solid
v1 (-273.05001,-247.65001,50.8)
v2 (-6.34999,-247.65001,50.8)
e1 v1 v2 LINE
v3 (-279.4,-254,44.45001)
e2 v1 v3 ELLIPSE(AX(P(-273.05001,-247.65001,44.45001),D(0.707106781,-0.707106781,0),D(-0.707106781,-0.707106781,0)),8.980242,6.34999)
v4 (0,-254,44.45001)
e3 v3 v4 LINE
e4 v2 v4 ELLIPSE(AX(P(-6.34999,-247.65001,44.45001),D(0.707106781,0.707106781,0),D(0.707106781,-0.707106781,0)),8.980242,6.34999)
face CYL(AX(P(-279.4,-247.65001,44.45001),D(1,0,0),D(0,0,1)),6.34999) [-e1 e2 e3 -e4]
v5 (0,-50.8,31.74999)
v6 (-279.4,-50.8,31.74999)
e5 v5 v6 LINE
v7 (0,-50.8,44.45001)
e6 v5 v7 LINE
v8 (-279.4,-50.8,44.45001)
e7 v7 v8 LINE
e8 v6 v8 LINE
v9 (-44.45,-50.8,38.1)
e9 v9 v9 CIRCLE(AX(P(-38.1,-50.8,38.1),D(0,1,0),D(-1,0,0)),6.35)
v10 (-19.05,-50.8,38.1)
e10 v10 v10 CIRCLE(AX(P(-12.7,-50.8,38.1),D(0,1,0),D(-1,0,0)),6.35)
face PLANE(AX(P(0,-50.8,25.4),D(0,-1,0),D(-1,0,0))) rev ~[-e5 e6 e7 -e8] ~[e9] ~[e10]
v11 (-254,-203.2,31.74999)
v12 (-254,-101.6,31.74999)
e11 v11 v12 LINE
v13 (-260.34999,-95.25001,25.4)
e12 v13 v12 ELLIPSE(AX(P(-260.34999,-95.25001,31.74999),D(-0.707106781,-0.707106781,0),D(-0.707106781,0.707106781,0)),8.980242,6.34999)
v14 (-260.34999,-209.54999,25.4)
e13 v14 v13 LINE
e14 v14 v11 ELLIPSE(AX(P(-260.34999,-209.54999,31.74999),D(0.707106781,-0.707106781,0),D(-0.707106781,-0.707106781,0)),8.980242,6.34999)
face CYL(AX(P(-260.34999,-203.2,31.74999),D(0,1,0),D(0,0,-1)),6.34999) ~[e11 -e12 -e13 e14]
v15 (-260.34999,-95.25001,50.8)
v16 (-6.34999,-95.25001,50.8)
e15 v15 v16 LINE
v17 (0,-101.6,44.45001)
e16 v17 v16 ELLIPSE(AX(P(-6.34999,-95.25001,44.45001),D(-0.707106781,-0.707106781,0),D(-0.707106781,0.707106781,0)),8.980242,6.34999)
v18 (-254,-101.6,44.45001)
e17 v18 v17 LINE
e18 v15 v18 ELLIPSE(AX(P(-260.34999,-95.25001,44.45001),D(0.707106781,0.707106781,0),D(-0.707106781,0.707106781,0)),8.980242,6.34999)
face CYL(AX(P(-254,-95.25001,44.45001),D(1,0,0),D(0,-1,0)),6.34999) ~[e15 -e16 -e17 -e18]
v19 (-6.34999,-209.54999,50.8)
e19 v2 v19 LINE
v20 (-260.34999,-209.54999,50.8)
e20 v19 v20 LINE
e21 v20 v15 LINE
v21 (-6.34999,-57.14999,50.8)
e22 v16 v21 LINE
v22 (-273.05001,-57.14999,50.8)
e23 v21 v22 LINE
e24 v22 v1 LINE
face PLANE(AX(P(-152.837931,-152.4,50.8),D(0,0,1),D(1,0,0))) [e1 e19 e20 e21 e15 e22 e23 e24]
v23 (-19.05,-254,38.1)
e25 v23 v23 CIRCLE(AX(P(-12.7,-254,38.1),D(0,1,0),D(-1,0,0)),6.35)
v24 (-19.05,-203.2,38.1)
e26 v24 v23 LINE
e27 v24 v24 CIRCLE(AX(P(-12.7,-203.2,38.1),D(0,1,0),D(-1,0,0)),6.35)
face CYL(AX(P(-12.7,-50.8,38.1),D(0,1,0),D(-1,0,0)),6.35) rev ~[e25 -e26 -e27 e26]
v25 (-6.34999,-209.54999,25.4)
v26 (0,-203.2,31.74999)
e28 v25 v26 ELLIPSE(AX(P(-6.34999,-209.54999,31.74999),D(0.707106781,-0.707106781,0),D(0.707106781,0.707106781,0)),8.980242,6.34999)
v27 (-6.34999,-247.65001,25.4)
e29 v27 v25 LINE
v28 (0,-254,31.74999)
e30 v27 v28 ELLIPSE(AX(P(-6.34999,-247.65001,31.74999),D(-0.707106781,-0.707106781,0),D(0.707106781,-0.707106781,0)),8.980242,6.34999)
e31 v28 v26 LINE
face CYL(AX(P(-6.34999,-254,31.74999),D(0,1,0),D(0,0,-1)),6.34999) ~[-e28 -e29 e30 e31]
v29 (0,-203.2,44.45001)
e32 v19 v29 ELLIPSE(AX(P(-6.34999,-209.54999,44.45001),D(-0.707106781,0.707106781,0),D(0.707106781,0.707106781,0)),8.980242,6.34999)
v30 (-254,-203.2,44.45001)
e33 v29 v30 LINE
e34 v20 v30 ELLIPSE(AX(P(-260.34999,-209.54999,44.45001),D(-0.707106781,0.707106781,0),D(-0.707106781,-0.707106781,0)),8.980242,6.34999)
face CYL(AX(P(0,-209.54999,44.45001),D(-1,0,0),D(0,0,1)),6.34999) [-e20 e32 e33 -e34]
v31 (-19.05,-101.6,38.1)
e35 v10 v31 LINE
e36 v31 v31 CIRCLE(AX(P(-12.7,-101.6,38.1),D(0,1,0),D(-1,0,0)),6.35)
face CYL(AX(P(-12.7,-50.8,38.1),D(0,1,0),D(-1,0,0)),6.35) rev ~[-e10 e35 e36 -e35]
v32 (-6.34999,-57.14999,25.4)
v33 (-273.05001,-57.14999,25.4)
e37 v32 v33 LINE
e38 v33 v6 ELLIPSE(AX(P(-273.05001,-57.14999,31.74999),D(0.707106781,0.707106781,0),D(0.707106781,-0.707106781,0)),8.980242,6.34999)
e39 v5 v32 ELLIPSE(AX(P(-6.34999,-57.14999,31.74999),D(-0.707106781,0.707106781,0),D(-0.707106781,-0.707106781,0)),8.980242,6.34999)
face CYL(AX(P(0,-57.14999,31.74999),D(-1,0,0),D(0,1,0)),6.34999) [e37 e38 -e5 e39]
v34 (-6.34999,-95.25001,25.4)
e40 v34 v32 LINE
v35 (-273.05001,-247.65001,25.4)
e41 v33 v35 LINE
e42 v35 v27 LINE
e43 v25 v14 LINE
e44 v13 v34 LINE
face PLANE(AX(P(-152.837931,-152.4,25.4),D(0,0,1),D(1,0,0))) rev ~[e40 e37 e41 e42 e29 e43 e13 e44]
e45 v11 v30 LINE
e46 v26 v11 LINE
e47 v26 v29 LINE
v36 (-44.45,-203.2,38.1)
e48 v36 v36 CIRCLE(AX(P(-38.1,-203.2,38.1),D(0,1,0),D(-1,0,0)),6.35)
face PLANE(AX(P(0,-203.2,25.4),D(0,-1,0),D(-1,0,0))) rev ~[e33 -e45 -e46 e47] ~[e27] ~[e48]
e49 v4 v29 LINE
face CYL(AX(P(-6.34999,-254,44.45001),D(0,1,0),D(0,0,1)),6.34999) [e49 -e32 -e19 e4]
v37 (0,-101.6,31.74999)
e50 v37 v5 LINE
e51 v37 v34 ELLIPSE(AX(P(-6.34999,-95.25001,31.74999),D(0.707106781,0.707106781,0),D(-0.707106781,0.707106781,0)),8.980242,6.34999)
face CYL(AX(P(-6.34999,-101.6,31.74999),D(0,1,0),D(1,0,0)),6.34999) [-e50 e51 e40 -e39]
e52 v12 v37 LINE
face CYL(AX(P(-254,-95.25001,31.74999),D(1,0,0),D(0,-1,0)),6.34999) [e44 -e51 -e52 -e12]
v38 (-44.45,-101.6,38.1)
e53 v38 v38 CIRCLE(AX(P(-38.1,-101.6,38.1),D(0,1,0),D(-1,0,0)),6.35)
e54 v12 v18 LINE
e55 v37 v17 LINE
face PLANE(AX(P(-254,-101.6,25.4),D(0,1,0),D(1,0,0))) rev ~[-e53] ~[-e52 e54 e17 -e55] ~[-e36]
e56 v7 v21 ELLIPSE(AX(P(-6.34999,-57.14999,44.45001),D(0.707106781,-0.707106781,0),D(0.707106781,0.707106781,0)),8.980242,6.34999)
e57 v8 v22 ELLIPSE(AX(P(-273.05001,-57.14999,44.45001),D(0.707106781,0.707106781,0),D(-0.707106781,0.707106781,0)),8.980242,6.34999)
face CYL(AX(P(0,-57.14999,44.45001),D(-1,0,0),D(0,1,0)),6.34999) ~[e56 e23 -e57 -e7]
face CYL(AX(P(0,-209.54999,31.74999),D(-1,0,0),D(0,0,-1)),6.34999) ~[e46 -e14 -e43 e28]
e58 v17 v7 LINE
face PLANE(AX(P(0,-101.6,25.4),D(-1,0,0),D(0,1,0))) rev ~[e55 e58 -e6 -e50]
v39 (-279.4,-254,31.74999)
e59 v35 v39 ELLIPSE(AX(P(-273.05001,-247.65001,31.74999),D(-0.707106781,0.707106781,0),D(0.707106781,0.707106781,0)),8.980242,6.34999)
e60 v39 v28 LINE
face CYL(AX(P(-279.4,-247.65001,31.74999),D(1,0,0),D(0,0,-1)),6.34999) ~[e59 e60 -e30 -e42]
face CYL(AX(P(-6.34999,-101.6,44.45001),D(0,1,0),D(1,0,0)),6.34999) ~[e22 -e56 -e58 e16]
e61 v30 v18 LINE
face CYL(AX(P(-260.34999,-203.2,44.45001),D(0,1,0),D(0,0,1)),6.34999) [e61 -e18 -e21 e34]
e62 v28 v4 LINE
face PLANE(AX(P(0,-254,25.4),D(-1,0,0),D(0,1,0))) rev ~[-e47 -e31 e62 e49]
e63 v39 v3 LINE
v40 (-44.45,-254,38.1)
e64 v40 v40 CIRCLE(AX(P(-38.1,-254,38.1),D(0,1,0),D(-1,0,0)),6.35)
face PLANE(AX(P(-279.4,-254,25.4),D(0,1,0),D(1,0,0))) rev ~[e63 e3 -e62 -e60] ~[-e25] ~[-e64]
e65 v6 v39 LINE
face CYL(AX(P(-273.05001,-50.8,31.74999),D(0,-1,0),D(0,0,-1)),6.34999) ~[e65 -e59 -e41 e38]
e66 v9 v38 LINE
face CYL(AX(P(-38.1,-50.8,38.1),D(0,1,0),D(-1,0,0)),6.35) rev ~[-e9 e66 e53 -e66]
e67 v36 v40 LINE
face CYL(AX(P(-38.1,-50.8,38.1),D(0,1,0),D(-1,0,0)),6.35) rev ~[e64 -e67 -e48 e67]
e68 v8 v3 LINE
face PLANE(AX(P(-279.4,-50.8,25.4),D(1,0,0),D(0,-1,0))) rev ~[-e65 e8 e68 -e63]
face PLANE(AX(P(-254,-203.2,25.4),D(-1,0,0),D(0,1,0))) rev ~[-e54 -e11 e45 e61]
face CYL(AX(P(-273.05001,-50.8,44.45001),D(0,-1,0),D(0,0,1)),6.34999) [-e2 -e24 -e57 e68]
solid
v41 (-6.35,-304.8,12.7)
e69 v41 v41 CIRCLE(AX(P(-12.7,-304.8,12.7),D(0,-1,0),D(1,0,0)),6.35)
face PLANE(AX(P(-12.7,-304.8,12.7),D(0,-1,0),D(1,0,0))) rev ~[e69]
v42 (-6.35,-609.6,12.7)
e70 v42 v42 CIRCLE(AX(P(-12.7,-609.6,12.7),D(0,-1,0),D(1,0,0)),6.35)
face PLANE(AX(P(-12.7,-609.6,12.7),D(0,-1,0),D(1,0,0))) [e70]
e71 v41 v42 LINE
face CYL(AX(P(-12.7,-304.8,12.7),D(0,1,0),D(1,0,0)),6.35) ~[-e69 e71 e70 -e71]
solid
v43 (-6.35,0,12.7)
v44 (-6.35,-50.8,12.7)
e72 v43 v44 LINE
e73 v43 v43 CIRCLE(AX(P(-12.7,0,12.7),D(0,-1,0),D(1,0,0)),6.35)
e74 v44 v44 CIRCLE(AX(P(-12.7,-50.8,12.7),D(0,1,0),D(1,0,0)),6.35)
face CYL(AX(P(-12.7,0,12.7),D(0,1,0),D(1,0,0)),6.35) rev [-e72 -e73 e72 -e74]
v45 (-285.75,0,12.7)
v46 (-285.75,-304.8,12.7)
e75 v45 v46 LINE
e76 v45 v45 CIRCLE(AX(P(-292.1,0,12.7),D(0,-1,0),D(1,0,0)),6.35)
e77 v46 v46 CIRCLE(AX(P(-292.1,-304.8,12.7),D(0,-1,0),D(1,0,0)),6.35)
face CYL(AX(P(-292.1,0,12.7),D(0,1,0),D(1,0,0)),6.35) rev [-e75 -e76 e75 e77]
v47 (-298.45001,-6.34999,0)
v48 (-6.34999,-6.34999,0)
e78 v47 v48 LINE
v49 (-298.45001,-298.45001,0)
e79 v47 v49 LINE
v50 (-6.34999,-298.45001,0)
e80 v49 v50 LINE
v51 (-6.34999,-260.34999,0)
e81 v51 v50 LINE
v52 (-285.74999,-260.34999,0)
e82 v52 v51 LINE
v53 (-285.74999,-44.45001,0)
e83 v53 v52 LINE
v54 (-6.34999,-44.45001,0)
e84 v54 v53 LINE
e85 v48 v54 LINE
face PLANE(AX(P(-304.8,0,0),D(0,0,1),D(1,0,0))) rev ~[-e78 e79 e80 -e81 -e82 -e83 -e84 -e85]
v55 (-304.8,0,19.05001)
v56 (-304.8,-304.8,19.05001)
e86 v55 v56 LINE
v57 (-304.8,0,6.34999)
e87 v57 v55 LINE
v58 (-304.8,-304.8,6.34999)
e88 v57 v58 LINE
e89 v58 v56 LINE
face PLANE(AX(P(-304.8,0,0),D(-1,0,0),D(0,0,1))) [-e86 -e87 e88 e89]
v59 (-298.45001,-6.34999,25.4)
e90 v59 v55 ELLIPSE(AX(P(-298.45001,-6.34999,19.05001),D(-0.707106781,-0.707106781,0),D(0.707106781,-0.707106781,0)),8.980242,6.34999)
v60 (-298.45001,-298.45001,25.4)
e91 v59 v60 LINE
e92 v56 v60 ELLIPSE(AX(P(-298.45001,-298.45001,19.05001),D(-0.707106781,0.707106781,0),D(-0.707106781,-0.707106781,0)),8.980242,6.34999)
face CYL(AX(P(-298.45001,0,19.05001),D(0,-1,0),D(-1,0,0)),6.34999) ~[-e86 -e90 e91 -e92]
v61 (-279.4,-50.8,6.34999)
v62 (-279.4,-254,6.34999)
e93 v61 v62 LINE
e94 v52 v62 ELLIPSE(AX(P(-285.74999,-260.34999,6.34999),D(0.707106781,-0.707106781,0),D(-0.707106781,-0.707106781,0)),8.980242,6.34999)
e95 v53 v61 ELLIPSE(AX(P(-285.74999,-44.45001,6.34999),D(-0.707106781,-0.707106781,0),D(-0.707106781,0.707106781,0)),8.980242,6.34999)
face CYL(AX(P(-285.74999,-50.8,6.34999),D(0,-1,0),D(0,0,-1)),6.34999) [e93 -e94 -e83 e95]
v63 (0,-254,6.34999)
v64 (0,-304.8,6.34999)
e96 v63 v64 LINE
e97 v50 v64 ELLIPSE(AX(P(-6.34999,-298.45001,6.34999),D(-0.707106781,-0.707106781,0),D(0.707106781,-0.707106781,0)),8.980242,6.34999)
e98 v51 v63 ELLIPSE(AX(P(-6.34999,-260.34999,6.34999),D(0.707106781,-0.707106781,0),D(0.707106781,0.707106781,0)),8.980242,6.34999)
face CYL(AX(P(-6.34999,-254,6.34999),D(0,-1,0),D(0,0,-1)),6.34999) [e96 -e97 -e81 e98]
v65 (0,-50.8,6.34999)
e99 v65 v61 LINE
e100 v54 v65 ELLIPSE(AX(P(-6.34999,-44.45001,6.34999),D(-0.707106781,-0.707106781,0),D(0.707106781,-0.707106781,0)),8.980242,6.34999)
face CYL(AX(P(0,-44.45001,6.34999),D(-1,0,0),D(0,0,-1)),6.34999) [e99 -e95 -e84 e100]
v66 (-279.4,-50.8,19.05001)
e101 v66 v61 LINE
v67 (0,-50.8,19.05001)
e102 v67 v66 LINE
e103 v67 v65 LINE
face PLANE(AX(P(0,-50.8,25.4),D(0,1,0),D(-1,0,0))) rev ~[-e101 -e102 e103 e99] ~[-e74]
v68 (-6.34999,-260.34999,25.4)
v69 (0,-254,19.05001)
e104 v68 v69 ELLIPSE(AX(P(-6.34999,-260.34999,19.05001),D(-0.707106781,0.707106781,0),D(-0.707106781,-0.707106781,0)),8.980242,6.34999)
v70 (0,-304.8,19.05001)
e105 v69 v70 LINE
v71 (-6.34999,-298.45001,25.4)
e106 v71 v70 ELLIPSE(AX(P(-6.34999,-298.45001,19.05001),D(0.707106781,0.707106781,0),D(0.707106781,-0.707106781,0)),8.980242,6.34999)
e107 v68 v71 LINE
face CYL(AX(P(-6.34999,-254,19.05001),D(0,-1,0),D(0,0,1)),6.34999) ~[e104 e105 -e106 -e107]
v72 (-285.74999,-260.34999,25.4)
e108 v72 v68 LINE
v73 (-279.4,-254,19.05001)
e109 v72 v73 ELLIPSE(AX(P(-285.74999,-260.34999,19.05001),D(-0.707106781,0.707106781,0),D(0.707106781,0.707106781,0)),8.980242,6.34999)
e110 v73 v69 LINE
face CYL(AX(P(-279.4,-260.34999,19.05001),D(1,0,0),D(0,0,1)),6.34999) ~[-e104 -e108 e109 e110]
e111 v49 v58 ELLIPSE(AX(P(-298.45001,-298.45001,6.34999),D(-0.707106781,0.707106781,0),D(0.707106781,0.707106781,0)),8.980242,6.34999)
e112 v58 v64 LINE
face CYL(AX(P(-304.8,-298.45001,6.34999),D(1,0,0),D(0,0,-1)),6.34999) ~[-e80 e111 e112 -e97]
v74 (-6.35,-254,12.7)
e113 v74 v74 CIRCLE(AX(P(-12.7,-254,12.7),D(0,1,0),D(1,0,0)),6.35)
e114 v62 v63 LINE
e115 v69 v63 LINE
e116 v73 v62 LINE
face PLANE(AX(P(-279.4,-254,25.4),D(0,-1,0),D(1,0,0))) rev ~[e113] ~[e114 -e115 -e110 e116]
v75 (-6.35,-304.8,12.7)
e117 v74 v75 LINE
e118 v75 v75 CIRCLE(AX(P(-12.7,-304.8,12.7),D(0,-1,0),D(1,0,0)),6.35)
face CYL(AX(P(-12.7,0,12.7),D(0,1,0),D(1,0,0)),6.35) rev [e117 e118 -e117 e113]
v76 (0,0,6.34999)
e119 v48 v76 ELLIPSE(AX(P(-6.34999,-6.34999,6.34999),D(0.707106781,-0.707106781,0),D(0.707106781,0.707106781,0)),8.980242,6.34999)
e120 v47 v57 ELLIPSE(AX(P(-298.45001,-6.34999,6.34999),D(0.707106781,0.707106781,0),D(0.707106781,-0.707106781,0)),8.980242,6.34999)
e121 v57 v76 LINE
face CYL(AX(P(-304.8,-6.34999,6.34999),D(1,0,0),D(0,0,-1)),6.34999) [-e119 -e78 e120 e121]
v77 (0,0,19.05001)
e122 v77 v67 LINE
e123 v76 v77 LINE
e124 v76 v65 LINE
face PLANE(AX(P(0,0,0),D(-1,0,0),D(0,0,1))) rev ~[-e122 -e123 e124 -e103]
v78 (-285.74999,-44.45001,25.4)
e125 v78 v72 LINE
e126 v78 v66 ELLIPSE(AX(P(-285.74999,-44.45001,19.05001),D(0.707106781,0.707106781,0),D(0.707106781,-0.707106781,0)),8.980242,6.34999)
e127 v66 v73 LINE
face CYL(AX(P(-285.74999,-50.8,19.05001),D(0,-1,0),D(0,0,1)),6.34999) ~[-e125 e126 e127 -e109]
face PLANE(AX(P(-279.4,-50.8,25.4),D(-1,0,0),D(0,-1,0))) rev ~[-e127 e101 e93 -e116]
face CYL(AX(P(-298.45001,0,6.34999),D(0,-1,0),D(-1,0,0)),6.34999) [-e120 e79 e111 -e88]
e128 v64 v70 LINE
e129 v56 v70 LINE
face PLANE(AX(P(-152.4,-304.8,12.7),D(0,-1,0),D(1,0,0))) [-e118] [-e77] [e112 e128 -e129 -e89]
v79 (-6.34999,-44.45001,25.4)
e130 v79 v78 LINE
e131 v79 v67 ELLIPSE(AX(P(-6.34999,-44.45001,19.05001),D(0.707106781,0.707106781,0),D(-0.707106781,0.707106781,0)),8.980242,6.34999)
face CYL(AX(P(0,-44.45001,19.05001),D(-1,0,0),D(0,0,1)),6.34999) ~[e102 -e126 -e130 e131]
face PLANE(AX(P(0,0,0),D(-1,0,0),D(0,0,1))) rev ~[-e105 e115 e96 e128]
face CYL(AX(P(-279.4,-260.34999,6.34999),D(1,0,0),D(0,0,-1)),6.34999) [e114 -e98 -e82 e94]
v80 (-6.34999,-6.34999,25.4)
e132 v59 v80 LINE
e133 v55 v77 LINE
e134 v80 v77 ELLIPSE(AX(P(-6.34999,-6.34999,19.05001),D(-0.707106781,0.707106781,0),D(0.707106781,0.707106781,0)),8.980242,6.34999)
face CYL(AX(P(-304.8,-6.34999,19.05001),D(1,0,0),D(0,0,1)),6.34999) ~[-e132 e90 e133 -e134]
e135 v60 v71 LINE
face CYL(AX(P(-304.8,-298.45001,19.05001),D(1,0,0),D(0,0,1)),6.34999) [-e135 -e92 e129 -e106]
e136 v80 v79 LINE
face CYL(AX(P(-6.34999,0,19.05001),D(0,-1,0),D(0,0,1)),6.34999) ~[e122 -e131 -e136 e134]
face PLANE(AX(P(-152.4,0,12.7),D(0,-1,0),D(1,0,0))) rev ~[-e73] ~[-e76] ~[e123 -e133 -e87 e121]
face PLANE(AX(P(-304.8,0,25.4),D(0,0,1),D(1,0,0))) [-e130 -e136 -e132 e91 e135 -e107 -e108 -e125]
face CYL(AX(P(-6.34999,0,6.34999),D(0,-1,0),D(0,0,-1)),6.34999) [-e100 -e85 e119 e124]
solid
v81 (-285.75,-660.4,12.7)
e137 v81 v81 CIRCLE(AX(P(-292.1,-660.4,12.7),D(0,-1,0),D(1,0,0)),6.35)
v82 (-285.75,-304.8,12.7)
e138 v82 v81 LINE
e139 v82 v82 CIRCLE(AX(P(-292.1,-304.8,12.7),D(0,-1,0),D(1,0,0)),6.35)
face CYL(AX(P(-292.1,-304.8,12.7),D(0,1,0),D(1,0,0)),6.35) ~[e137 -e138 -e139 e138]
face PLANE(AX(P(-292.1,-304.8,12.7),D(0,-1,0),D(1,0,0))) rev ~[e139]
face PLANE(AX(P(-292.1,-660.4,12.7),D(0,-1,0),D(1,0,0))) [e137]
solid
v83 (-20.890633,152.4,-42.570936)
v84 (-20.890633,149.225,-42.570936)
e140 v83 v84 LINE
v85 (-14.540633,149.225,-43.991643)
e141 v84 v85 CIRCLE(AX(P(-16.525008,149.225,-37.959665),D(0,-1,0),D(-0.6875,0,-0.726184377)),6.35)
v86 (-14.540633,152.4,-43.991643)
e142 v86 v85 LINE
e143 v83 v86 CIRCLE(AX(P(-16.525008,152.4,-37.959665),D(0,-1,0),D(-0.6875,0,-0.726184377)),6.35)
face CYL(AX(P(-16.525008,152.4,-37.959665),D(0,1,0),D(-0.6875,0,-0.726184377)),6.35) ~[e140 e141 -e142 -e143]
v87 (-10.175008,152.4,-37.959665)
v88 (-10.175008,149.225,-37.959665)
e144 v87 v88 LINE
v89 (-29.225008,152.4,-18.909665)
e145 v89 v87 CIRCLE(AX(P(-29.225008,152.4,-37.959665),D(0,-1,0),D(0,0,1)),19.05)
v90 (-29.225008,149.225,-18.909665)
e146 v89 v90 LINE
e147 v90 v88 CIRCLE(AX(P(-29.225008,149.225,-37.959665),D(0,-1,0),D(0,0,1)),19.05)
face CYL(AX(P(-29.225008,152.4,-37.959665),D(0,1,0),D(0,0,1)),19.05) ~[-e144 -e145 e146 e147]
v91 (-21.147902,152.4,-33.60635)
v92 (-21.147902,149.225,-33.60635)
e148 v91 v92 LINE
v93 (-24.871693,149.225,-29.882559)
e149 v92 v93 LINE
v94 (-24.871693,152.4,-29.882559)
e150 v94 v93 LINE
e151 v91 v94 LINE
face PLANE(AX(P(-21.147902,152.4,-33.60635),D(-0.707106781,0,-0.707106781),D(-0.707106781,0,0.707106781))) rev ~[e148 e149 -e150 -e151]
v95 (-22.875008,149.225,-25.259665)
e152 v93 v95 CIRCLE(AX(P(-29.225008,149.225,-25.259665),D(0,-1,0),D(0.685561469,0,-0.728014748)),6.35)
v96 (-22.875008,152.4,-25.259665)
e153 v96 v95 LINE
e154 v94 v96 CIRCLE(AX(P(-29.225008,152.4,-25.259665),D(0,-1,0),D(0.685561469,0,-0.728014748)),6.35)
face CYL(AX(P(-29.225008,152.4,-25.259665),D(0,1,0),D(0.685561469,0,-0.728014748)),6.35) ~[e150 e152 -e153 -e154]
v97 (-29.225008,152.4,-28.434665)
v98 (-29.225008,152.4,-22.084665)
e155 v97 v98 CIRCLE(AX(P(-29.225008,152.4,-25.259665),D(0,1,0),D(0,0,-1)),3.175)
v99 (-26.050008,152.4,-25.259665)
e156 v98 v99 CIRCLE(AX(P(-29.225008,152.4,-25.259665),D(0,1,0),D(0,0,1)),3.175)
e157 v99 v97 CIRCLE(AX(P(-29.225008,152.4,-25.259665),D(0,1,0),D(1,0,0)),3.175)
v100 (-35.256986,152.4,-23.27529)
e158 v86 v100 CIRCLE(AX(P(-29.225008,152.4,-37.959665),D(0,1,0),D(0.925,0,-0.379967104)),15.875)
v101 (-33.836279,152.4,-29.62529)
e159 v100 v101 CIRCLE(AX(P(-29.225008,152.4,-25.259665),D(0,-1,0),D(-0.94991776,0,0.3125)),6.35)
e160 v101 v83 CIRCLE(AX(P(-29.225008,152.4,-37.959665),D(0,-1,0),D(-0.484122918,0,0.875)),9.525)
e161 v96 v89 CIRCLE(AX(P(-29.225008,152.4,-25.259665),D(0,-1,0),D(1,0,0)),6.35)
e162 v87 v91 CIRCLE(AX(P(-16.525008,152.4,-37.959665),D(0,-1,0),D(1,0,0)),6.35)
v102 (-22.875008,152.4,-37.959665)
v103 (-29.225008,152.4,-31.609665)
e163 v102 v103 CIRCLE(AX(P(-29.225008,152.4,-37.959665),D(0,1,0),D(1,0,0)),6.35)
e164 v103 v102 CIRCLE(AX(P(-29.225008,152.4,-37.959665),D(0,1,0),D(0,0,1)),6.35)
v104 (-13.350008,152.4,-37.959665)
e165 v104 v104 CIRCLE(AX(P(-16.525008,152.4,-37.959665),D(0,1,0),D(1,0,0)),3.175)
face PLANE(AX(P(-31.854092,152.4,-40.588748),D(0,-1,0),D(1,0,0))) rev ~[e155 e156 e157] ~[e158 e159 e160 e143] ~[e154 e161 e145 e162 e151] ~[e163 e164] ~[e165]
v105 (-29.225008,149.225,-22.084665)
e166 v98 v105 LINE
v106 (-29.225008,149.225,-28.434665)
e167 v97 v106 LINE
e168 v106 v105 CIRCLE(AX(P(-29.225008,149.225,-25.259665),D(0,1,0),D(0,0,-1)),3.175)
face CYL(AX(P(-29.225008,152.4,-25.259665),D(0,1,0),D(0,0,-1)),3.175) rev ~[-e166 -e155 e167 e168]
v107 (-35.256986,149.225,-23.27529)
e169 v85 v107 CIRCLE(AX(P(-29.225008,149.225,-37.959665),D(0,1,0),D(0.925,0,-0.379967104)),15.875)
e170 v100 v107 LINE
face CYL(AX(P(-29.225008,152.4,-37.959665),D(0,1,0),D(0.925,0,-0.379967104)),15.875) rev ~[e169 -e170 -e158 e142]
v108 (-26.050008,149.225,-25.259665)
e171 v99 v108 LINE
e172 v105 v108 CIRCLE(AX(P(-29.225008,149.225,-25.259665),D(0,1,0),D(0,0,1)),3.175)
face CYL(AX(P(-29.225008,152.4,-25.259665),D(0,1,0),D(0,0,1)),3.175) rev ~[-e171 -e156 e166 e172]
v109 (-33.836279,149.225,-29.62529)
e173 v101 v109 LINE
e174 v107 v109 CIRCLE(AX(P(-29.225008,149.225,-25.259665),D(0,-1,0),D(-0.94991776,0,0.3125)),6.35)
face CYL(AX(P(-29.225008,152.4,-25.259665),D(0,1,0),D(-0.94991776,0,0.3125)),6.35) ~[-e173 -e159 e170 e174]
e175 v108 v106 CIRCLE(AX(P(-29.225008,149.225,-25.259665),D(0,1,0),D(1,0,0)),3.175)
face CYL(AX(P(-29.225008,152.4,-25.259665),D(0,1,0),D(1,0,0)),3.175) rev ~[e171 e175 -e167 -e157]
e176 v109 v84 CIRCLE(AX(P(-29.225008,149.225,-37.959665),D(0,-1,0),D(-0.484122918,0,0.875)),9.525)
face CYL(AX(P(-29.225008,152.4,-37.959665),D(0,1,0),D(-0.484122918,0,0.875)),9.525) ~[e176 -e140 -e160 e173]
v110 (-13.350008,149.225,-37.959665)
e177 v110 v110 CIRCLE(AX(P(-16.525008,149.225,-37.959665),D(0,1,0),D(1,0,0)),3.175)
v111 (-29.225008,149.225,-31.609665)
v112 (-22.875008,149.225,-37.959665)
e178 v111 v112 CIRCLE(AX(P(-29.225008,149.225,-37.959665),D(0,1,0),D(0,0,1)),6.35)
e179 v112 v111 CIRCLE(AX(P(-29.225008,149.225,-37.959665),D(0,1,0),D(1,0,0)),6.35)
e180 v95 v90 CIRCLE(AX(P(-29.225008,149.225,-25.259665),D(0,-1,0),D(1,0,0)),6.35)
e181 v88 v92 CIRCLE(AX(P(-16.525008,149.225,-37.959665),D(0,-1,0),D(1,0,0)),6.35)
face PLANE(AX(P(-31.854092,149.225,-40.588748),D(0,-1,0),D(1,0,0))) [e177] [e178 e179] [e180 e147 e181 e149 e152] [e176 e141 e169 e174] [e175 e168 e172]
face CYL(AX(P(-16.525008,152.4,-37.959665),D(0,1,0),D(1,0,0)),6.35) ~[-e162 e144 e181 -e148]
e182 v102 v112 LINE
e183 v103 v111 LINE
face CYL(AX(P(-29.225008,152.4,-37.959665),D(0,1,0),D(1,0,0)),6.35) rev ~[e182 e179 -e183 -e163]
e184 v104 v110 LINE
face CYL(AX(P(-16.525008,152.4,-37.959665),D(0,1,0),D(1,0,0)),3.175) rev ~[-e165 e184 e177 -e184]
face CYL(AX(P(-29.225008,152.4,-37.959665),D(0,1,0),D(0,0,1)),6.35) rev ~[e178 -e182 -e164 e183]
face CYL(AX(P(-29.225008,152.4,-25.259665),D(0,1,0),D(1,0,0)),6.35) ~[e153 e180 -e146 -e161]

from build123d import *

# Parameters (mm, degrees)
F0_W      = 304.8
F0_H      = 25.4
F0_R      = 6.35
F1_DEPTH  = 304.8
F3_DEPTH  = 25.4
F4_R      = 6.35
F5_DEPTH  = 254.001
F2_W      = 254
F2_H      = 101.6
F6_DEPTH  = 25.401
F7_R      = 6.35
F8_DEPTH  = 304.8
F9_R      = 6.35
F10_DEPTH = 355.6
F11_R     = 6.34999
F11_2_R   = 6.34999
F14_DEPTH = 3.175


# Not quite as in the source:
# - a fillet or chamfer is up to 0.001 mm smaller than in the source, because OpenCascade refuses the exact size
# - a feature names something its author has since deleted; it is built from what else it names


with BuildPart() as f1:
    # F0 (on Front) → F1 (new body)
    with BuildSketch(Plane.XZ):
        with Locations((-152.4, 12.7)):
            Rectangle(F0_W, F0_H)
        with Locations((-292.1, 12.7)):
            Circle(F0_R, mode=Mode.SUBTRACT)
        with Locations((-12.7, 12.7)):
            Circle(F0_R, mode=Mode.SUBTRACT)
    extrude(amount=F1_DEPTH)

    # F2 (on face) → F6 (cut, through all)
    with BuildSketch(Plane.XY.offset(25.4)):
        Polygon((0, -101.6), (0, -50.8), (-279.4, -50.8), (-279.4, -254), (0, -254), (0, -203.2), (-254, -203.2), (-254, -101.6), align=None)
        with Locations((-127, -152.4)):
            Rectangle(F2_W, F2_H)
    extrude(amount=-F6_DEPTH, mode=Mode.SUBTRACT)

    # F11 (radius 6.35 in the source; OpenCascade refuses exactly that, so slightly less here)
    f11_edges = [f1.edges().sort_by_distance(p)[0] for p in [
        (-152.4, 0, 25.4),
        (-304.8, -152.4, 25.4),
        (-152.4, -304.8, 25.4),
        (0, -279.4, 25.4),
        (-139.7, -254, 25.4),
        (-279.4, -152.4, 25.4),
        (-139.7, -50.8, 25.4),
        (0, -25.4, 25.4),
        (-152.4, 0, 0),
        (0, -25.4, 0),
        (-139.7, -50.8, 0),
        (-279.4, -152.4, 0),
        (-139.7, -254, 0),
        (0, -279.4, 0),
        (-152.4, -304.8, 0),
        (-304.8, -152.4, 0),
    ]]
    fillet(f11_edges, radius=F11_R)


with BuildPart() as f3:
    # F2 (on face) → F3 (new body)
    with BuildSketch(Plane.XY.offset(25.4)):
        Polygon((0, -101.6), (0, -50.8), (-279.4, -50.8), (-279.4, -254), (0, -254), (0, -203.2), (-254, -203.2), (-254, -101.6), align=None)
    extrude(amount=F3_DEPTH)

    # F4 (on face) → F5 (cut, through all)
    with BuildSketch(Plane(origin=(0, -50.8, 0), x_dir=(-1, 0, 0), z_dir=(0, 1, 0))):
        with Locations((12.7, 38.1)):
            Circle(F4_R)
        with Locations((38.1, 38.1)):
            Circle(F4_R)
    extrude(amount=-F5_DEPTH, mode=Mode.SUBTRACT)

    # F11#2 (radius 6.35 in the source; OpenCascade refuses exactly that, so slightly less here)
    f11_2_edges = [f3.edges().sort_by_distance(p)[0] for p in [
        (-139.7, -254, 25.4),
        (-279.4, -152.4, 25.4),
        (-139.7, -50.8, 25.4),
        (0, -76.2, 50.8),
        (-139.7, -50.8, 50.8),
        (-279.4, -152.4, 50.8),
        (-139.7, -254, 50.8),
        (0, -228.6, 50.8),
        (-127, -203.2, 50.8),
        (-254, -152.4, 50.8),
        (-127, -101.6, 50.8),
        (0, -76.2, 25.4),
        (0, -228.6, 25.4),
        (-127, -203.2, 25.4),
        (-254, -152.4, 25.4),
        (-127, -101.6, 25.4),
    ]]
    fillet(f11_2_edges, radius=F11_2_R)


with BuildPart() as f8:
    # F7 (on face) → F8 (new body)
    with BuildSketch(Plane.XZ.offset(304.8)):
        with Locations((-12.7, 12.7)):
            Circle(F7_R)
    extrude(amount=F8_DEPTH)


with BuildPart() as f10:
    # F9 (on face) → F10 (new body)
    with BuildSketch(Plane.XZ.offset(304.8)):
        with Locations((-292.1, 12.7)):
            Circle(F9_R)
    extrude(amount=F10_DEPTH)


with BuildPart() as f14:
    # F13 (on offset) → F14 (new body)
    with BuildSketch(Plane.XZ.offset(-152.4)):
        with BuildLine():
            ThreePointArc((-29.2250082641, -18.9096650779), (-42.6953924457, -51.4300492595), (-10.1750082641, -37.9596650779))
            ThreePointArc((-10.1750082641, -37.9596650779), (-11.3809203347, -41.6826825873), (-14.5406332641, -43.9916428514))
            ThreePointArc((-14.5406332641, -43.9916428514), (-40.4503284154, -49.1849852293), (-35.2569860376, -23.2752900779))
            ThreePointArc((-35.2569860376, -23.2752900779), (-32.9480257735, -20.1155771486), (-29.2250082641, -18.9096650779))
        make_face()
        with BuildLine():
            ThreePointArc((-20.8906332641, -42.5709358745), (-22.3578557141, -40.4697229707), (-22.8750082641, -37.9596650779))
            ThreePointArc((-22.8750082641, -37.9596650779), (-33.7151363246, -42.4497931385), (-29.2250082641, -31.6096650779))
            ThreePointArc((-29.2250082641, -31.6096650779), (-31.7350661569, -31.0925125279), (-33.8362790607, -29.6252900779))
            ThreePointArc((-33.8362790607, -29.6252900779), (-35.9602003549, -44.6948571687), (-20.8906332641, -42.5709358745))
        make_face()
        with BuildLine():
            ThreePointArc((-35.2569860376, -23.2752900779), (-35.4218066335, -26.6460957358), (-33.8362790607, -29.6252900779))
            ThreePointArc((-33.8362790607, -29.6252900779), (-31.6062582641, -28.7371234848), (-29.2250082641, -28.4346650779))
            ThreePointArc((-29.2250082641, -28.4346650779), (-32.4000082641, -25.2596650779), (-29.2250082641, -22.0846650779))
            ThreePointArc((-29.2250082641, -22.0846650779), (-32.2991887952, -22.3851654371), (-35.2569860376, -23.2752900779))
        make_face()
        with BuildLine():
            ThreePointArc((-33.8362790607, -29.6252900779), (-31.7350661569, -31.0925125279), (-29.2250082641, -31.6096650779))
            ThreePointArc((-29.2250082641, -31.6096650779), (-26.8833074573, -31.1621168847), (-24.8716929388, -29.8825587257))
            ThreePointArc((-24.8716929388, -29.8825587257), (-23.3955120459, -27.7774962562), (-22.8750082641, -25.2596650779))
            ThreePointArc((-22.8750082641, -25.2596650779), (-24.7348802036, -20.7695370174), (-29.2250082641, -18.9096650779))
            ThreePointArc((-29.2250082641, -18.9096650779), (-32.9480257735, -20.1155771486), (-35.2569860376, -23.2752900779))
            ThreePointArc((-35.2569860376, -23.2752900779), (-32.2991887952, -22.3851654371), (-29.2250082641, -22.0846650779))
            ThreePointArc((-29.2250082641, -22.0846650779), (-26.9799442338, -23.0146010477), (-26.0500082641, -25.2596650779))
            ThreePointArc((-26.0500082641, -25.2596650779), (-26.9799442338, -27.5047291082), (-29.2250082641, -28.4346650779))
            ThreePointArc((-29.2250082641, -28.4346650779), (-31.6062582641, -28.7371234848), (-33.8362790607, -29.6252900779))
        make_face()
        with BuildLine():
            ThreePointArc((-21.1479019119, -33.6063497526), (-22.4274600709, -35.6179642712), (-22.8750082641, -37.9596650779))
            ThreePointArc((-22.8750082641, -37.9596650779), (-22.3578557141, -40.4697229707), (-20.8906332641, -42.5709358745))
            ThreePointArc((-20.8906332641, -42.5709358745), (-20.0024666709, -40.3409150779), (-19.7000082641, -37.9596650779))
            ThreePointArc((-19.7000082641, -37.9596650779), (-16.5250082641, -34.7846650779), (-13.3500082641, -37.9596650779))
            ThreePointArc((-13.3500082641, -37.9596650779), (-13.6505086233, -41.033845609), (-14.5406332641, -43.9916428514))
            ThreePointArc((-14.5406332641, -43.9916428514), (-11.3809203347, -41.6826825873), (-10.1750082641, -37.9596650779))
            ThreePointArc((-10.1750082641, -37.9596650779), (-14.1833074573, -32.0572132711), (-21.1479019119, -33.6063497526))
        make_face()
        with BuildLine():
            ThreePointArc((-19.7000082641, -37.9596650779), (-20.0024666709, -40.3409150779), (-20.8906332641, -42.5709358745))
            ThreePointArc((-20.8906332641, -42.5709358745), (-17.911438922, -44.1564634473), (-14.5406332641, -43.9916428514))
            ThreePointArc((-14.5406332641, -43.9916428514), (-13.6505086233, -41.033845609), (-13.3500082641, -37.9596650779))
            ThreePointArc((-13.3500082641, -37.9596650779), (-16.5250082641, -41.1346650779), (-19.7000082641, -37.9596650779))
        make_face()
        with BuildLine():
            ThreePointArc((-29.2250082641, -31.6096650779), (-24.7348802036, -33.4695370174), (-22.8750082641, -37.9596650779))
            ThreePointArc((-22.8750082641, -37.9596650779), (-22.4274600709, -35.6179642712), (-21.1479019119, -33.6063497526))
            Line((-21.1479019119, -33.6063497526), (-24.8716929388, -29.8825587257))
            ThreePointArc((-24.8716929388, -29.8825587257), (-26.8833074573, -31.1621168847), (-29.2250082641, -31.6096650779))
        make_face()
    extrude(amount=F14_DEPTH)


solid = Compound([f1.part, f3.part, f8.part, f10.part, f14.part])
